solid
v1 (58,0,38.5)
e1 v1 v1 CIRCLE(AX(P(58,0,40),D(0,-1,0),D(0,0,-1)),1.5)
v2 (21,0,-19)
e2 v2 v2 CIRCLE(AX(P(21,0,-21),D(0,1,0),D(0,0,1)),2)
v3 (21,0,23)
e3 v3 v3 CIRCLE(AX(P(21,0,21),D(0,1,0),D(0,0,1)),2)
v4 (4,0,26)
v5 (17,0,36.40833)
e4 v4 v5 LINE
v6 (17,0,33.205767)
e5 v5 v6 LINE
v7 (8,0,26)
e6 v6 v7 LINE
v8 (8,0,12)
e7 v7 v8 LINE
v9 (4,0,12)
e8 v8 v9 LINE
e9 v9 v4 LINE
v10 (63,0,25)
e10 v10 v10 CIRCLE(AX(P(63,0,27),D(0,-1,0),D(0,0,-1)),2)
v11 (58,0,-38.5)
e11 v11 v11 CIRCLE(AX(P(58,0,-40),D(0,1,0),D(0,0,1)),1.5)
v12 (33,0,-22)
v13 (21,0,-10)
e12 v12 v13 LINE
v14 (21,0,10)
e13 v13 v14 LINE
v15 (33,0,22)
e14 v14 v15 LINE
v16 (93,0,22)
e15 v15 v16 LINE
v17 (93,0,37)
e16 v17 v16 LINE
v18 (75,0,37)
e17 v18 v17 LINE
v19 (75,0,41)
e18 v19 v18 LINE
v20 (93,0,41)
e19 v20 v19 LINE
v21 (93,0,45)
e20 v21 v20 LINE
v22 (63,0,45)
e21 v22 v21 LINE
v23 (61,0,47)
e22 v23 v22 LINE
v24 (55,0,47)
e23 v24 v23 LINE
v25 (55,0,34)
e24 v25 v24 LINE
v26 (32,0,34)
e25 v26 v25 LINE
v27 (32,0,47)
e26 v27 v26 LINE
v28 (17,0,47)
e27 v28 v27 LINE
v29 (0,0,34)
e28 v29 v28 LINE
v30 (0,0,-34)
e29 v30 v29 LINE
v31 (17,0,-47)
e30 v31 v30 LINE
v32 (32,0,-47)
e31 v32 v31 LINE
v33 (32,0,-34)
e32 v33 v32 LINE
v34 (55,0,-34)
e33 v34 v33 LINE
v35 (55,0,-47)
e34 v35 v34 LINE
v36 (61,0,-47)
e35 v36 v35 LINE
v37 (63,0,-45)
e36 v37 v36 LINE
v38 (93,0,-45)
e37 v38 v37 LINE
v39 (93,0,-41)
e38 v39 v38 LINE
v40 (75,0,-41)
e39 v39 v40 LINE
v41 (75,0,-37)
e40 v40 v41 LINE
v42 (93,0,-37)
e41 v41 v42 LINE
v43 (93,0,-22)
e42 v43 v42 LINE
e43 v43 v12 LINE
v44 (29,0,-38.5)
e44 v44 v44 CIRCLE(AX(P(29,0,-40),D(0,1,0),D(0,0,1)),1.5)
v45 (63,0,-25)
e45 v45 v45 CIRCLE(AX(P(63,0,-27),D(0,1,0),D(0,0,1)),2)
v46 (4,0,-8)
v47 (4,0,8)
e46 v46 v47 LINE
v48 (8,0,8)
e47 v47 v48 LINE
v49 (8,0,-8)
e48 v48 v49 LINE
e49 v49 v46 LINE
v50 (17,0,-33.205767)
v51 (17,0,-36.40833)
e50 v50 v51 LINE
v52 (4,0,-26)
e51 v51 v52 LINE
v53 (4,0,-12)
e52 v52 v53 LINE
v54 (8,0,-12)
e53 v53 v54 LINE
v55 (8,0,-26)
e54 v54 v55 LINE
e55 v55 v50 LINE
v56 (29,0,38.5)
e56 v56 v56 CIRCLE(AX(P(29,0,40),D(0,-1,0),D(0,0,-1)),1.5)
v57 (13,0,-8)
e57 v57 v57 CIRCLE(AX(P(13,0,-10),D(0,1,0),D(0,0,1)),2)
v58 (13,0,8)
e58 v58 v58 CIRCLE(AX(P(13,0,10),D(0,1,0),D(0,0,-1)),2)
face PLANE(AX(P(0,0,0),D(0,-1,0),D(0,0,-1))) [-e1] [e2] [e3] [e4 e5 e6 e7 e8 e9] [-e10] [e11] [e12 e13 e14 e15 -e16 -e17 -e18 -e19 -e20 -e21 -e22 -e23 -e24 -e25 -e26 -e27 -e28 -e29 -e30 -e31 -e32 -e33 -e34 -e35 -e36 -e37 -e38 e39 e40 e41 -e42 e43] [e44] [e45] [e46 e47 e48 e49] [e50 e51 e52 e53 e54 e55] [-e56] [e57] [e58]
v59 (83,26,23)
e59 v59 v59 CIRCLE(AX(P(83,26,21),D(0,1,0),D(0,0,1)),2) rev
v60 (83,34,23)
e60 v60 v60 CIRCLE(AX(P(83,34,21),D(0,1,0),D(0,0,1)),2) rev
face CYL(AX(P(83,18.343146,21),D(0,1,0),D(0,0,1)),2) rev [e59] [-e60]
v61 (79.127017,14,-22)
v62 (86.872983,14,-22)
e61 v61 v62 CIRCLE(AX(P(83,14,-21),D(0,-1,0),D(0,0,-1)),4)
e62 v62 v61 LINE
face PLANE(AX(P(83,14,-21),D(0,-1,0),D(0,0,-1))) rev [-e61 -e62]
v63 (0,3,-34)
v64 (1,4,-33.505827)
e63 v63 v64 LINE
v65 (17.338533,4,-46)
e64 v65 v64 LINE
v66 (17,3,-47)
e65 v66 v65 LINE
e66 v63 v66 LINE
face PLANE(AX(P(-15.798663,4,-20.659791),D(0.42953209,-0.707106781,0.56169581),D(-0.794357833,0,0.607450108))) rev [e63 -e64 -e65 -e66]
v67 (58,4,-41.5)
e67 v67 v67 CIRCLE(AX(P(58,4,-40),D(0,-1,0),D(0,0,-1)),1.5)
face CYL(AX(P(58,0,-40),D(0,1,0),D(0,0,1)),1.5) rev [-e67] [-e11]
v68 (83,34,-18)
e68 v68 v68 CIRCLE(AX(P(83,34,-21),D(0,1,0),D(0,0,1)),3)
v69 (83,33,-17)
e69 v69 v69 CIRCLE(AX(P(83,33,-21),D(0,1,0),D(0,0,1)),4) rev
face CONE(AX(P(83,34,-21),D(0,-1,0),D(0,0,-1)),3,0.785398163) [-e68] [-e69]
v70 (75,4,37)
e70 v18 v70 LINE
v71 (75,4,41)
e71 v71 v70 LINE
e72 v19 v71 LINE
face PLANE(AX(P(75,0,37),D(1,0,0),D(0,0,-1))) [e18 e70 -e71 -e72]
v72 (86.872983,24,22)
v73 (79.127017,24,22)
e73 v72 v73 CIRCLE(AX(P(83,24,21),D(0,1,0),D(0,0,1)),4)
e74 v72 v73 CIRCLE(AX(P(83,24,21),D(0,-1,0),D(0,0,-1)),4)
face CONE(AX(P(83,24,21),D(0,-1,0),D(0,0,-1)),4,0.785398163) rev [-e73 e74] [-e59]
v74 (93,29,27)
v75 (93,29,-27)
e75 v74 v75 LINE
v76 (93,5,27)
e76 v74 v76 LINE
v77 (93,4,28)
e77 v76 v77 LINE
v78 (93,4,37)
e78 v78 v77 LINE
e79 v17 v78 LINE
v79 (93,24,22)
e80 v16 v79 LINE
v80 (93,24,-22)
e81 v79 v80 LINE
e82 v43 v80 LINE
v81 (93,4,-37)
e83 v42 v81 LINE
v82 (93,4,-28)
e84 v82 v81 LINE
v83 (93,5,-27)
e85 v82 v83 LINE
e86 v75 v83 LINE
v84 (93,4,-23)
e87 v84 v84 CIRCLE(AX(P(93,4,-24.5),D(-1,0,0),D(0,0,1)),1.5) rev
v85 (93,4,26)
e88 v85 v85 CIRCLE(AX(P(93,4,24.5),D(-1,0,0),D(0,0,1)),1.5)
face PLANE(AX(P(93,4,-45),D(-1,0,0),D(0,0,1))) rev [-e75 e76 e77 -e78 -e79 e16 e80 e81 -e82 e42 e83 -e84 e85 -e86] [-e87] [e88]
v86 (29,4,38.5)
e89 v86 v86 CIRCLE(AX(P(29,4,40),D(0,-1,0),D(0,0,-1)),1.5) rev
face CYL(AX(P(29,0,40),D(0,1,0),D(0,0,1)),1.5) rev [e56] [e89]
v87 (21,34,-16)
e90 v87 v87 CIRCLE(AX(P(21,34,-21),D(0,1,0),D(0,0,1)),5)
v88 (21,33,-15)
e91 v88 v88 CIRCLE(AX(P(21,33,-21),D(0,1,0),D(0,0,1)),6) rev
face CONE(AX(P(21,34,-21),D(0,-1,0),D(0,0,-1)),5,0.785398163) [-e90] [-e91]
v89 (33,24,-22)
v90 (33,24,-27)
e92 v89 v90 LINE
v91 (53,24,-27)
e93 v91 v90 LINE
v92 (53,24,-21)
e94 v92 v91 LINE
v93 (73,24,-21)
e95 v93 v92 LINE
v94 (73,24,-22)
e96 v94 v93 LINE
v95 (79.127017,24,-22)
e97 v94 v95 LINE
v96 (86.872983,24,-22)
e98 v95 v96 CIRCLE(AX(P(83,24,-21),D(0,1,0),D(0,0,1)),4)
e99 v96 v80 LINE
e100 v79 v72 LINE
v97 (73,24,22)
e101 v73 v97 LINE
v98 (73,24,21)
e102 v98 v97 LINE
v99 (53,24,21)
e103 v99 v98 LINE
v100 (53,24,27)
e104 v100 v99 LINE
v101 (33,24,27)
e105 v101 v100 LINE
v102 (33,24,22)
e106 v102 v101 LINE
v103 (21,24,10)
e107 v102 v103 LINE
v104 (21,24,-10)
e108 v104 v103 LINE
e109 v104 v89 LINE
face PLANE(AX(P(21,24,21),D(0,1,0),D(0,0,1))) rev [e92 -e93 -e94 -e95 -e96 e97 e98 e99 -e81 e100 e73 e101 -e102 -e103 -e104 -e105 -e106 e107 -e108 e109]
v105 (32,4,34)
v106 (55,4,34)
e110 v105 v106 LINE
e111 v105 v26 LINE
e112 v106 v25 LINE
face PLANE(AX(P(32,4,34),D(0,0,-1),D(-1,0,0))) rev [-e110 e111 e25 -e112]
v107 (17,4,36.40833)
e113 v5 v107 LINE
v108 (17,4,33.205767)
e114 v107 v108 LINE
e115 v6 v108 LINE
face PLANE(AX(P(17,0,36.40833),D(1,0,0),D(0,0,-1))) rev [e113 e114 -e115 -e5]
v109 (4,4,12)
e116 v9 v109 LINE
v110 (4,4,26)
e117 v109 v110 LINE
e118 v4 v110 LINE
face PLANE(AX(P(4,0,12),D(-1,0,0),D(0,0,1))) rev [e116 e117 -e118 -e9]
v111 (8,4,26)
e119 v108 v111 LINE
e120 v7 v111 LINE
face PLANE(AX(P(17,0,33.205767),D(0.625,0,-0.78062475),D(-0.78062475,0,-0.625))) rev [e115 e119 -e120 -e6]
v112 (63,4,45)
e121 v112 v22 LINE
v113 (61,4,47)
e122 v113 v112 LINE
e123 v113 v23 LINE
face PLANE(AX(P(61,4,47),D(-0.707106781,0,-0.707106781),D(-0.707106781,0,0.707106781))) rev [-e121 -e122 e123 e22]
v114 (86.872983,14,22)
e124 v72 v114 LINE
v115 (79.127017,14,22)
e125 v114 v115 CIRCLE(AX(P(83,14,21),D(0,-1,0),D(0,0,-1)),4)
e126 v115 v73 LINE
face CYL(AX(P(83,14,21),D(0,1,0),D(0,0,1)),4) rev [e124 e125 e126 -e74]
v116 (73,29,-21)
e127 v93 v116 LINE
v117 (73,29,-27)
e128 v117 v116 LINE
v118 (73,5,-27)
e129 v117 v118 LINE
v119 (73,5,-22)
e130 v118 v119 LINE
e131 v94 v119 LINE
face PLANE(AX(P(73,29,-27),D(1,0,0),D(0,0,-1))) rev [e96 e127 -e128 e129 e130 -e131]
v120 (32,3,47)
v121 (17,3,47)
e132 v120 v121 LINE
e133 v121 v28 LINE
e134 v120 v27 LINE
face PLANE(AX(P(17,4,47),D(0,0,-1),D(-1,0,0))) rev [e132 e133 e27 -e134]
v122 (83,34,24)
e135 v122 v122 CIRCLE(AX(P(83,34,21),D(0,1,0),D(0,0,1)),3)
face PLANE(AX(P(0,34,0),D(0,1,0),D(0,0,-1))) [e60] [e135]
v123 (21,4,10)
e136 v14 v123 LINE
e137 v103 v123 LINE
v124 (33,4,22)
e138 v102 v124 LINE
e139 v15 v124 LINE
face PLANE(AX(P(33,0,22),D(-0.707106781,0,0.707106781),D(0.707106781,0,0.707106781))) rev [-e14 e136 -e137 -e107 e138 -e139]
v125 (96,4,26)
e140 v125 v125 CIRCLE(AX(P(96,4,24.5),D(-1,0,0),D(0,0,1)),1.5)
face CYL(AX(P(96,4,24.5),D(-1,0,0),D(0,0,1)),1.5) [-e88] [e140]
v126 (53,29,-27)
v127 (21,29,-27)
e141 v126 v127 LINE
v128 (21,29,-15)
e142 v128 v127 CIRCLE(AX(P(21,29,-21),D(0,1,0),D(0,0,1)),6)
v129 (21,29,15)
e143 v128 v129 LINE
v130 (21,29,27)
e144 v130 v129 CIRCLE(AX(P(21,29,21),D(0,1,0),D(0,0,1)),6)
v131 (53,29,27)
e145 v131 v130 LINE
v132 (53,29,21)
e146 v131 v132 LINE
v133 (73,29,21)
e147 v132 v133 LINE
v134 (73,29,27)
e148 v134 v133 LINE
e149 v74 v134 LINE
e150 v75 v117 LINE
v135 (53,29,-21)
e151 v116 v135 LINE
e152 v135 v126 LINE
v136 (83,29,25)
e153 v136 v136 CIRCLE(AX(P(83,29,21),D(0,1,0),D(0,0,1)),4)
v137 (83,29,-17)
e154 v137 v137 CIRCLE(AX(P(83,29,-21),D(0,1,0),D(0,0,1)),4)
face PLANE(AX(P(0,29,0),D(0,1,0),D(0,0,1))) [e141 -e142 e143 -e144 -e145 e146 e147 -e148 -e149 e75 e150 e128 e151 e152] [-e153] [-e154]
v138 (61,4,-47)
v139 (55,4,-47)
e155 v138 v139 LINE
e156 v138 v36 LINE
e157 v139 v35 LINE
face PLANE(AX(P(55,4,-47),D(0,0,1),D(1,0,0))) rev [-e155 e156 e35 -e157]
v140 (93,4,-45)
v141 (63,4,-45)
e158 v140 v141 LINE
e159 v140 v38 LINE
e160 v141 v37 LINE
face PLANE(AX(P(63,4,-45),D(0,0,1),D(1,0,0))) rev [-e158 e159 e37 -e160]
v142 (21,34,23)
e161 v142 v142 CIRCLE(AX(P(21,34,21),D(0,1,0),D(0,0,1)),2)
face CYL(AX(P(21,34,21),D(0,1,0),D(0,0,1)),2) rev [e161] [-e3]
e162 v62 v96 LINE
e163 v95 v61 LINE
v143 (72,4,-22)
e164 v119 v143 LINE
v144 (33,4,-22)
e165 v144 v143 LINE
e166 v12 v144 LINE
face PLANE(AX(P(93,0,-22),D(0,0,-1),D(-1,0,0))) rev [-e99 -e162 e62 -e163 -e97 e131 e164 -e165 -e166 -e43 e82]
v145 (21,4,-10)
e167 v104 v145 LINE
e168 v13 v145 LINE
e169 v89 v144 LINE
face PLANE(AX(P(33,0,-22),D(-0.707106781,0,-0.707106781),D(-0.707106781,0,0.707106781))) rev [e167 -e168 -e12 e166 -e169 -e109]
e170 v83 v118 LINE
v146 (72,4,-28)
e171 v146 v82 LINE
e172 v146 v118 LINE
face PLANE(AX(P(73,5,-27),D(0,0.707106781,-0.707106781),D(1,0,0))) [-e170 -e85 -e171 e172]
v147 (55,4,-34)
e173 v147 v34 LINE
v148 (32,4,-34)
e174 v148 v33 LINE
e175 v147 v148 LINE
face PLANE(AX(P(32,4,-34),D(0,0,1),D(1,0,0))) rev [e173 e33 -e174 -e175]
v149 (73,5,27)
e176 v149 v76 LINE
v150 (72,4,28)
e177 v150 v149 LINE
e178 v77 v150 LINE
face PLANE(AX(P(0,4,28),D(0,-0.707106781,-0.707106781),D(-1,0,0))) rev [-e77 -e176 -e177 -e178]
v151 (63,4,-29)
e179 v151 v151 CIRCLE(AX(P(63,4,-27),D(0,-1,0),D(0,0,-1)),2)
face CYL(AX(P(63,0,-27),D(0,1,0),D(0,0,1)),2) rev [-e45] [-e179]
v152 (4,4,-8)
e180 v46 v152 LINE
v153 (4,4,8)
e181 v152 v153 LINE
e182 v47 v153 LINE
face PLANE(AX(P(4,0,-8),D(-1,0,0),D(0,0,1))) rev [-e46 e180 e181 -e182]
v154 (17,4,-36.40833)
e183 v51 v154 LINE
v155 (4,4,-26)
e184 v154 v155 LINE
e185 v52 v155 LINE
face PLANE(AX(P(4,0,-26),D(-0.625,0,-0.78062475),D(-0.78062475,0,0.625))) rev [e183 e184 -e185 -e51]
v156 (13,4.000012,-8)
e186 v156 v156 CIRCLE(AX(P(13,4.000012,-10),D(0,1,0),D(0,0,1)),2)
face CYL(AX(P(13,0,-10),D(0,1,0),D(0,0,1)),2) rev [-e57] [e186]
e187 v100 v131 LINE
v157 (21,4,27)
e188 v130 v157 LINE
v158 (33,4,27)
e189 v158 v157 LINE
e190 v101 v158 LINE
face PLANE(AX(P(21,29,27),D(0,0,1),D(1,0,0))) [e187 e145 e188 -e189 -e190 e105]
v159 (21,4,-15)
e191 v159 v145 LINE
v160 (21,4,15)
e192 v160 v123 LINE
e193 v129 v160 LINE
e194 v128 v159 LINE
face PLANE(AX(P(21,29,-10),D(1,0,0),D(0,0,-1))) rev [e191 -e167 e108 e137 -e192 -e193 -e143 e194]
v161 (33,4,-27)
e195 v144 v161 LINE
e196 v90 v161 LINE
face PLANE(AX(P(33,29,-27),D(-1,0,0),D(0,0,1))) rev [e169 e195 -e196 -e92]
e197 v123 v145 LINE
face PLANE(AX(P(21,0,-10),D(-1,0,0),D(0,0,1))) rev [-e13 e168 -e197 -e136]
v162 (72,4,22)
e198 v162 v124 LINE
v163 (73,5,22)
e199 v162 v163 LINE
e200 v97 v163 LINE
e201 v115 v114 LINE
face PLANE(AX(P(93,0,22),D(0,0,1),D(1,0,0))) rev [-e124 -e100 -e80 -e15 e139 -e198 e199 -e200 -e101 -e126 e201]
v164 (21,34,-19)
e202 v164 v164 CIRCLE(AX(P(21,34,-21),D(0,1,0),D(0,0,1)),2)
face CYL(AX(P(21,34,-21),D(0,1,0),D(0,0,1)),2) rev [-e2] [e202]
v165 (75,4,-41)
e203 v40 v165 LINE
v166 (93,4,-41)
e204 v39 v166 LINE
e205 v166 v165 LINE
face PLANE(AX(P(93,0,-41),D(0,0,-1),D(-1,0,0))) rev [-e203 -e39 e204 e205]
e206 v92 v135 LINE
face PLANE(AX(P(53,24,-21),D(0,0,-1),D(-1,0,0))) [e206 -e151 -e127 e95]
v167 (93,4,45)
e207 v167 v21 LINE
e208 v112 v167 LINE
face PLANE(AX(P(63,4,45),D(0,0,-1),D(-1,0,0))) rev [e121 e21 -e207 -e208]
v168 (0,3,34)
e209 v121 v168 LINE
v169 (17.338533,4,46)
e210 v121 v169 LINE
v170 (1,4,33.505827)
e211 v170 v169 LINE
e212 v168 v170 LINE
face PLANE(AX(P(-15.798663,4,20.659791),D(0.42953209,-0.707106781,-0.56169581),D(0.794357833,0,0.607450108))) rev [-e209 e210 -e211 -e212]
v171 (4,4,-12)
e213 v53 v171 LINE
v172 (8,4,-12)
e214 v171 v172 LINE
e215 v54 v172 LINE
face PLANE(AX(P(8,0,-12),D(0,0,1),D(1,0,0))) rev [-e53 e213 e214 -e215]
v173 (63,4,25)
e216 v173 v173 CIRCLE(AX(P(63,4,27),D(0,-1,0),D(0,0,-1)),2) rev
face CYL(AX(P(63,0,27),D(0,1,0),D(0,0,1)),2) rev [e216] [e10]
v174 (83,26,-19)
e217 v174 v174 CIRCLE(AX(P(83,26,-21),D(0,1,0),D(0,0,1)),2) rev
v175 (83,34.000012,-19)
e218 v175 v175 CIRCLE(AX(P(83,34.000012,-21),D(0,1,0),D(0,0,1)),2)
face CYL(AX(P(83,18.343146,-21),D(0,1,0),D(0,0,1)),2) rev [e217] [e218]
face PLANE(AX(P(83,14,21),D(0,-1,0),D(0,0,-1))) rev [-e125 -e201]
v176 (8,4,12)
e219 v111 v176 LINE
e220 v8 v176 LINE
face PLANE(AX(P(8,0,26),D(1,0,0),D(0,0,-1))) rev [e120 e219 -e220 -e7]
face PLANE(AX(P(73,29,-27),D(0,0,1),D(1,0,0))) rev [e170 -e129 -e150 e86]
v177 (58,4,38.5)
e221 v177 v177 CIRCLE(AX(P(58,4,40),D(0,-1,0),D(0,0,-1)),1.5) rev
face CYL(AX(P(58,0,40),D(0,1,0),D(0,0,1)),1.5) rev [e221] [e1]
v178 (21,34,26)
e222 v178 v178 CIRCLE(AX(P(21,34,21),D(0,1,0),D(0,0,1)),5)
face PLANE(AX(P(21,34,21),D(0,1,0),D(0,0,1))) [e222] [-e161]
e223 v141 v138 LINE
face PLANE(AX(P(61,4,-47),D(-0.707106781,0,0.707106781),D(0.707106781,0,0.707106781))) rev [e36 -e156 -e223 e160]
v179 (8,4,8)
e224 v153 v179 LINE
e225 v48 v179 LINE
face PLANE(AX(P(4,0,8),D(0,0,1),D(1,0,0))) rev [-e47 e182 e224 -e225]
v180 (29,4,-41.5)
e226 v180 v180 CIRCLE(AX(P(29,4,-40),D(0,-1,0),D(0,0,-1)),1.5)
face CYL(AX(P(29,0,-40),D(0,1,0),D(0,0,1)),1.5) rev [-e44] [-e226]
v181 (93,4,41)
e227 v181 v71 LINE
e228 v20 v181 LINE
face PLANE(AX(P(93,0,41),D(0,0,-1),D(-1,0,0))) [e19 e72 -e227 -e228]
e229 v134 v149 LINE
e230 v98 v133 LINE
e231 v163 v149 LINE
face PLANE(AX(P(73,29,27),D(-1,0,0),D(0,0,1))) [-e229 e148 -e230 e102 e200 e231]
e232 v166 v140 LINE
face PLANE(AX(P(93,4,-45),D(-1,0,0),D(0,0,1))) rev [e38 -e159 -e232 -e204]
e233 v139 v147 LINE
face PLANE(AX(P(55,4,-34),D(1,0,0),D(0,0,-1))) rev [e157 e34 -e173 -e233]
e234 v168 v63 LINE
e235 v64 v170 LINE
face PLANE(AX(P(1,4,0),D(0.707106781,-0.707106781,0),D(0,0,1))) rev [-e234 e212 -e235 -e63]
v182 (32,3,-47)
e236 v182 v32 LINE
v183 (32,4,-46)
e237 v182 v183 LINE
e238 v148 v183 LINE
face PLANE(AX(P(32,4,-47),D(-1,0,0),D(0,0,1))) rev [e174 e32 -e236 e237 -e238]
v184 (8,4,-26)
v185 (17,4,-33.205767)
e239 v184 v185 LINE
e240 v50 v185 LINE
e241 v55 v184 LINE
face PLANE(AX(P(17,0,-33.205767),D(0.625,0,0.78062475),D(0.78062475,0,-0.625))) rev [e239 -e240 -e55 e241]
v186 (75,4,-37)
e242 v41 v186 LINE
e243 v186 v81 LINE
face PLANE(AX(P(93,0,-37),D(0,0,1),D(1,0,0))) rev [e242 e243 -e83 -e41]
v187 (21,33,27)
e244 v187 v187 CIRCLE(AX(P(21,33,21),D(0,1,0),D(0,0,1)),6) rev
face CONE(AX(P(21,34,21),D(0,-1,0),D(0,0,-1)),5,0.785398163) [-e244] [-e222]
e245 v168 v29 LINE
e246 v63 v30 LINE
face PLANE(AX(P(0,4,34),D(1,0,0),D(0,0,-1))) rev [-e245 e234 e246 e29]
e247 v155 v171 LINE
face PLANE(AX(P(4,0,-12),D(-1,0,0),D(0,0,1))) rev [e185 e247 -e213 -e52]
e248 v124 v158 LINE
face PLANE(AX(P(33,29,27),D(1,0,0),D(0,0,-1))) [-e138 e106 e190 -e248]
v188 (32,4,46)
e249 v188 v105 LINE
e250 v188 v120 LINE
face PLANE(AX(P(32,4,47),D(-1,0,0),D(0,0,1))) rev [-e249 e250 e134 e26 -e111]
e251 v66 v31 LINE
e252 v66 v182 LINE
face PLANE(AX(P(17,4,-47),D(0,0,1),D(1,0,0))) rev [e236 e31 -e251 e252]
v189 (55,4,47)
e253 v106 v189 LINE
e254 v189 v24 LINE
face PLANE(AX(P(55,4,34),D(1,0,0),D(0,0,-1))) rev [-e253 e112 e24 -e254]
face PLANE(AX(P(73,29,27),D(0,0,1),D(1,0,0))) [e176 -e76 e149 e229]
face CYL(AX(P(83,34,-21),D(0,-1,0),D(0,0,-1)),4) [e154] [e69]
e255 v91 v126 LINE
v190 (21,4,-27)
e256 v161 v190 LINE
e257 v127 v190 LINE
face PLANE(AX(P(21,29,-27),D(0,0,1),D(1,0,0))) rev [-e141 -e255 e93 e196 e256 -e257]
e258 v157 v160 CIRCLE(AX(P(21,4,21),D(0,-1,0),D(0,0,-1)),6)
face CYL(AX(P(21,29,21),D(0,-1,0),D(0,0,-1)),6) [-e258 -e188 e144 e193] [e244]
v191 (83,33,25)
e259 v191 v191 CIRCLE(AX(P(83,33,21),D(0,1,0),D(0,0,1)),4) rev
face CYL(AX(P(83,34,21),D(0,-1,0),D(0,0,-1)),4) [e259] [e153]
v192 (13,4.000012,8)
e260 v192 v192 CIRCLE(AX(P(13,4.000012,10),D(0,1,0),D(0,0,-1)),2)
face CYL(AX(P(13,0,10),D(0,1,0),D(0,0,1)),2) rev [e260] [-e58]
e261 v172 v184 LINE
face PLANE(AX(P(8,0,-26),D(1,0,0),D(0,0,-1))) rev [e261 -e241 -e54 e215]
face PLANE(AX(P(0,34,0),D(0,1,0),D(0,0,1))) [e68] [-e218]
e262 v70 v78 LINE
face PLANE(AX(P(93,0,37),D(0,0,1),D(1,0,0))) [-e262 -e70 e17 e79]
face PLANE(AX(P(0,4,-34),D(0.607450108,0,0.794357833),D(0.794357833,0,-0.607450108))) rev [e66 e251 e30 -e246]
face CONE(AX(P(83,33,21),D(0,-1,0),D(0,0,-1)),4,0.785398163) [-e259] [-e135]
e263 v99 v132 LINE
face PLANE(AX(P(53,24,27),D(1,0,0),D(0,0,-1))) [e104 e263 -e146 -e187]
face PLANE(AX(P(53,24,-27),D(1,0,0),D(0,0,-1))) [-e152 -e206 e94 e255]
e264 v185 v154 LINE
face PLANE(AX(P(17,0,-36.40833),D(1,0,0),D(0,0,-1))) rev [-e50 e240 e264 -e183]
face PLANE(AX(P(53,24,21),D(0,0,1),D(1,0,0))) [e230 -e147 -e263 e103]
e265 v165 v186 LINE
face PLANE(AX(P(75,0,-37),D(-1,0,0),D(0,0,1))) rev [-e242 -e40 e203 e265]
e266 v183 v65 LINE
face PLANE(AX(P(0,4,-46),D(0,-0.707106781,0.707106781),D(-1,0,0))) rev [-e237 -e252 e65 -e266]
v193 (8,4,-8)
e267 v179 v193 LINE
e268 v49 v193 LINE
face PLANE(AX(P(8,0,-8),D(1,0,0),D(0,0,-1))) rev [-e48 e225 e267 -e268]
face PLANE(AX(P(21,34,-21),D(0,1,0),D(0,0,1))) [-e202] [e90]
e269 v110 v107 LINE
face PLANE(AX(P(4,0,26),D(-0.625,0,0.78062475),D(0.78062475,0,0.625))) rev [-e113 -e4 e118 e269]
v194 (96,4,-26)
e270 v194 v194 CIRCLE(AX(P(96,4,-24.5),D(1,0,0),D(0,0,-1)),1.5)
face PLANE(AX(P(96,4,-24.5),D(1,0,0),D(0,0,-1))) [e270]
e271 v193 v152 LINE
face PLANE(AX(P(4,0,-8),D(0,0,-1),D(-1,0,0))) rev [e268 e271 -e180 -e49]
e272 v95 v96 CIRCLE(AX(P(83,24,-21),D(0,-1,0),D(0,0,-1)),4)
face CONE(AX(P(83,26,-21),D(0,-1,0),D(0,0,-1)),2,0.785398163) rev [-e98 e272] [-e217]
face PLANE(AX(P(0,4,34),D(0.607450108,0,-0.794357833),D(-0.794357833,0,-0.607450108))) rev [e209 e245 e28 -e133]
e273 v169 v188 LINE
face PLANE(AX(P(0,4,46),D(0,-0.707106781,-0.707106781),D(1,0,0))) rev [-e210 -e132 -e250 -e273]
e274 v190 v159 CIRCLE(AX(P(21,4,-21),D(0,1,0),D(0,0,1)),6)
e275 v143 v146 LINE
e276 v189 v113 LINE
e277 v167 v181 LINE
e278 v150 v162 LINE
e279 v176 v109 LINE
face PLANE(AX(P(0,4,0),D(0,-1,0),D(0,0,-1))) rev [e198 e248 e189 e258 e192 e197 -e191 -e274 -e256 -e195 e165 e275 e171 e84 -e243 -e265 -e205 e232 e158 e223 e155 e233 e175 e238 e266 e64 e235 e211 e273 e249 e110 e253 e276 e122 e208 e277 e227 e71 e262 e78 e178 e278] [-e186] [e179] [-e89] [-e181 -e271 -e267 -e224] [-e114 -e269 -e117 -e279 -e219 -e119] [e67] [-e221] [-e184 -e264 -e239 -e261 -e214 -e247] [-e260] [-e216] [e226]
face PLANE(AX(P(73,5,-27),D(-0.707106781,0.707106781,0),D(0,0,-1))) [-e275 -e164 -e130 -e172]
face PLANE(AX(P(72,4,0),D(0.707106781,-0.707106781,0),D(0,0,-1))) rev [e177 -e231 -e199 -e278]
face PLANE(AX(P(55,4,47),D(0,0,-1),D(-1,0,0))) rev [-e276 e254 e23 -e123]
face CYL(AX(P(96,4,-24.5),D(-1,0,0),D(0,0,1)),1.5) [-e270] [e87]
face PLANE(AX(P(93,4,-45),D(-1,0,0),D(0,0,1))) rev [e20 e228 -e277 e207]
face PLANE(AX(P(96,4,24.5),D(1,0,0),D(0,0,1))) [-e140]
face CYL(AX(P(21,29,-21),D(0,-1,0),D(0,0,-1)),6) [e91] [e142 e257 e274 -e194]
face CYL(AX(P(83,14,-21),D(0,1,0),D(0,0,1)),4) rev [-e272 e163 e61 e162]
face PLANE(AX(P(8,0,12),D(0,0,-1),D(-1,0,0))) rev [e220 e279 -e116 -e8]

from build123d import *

# Parameters (mm, degrees)
EXTRUDE_1_DEPTH                = 4
CUT_EXTRUDE_1_DEPTH            = 105.27847333
CUT_EXTRUDE_1_DEPTH_BACK       = 105.27847333
SKETCH_2_R                     = 2
SKETCH_2_W                     = 4
SKETCH_2_H                     = 16
CHAMFER_1_SIZE                 = 1
CUT_EXTRUDE_2_DEPTH            = 105.27847333
CUT_EXTRUDE_2_DEPTH_BACK       = 105.27847333
SKETCH_6_W                     = 20
SKETCH_6_H                     = 5
EXTRUDE_2_DEPTH                = 25
CHAMFER_2_SIZE                 = 1
EXTRUDE_START                  = -5
EXTRUDE_3_DEPTH                = 5
SKETCH_8_R                     = 6
EXTRUDE_4_DEPTH                = 5
CHAMFER_3_SIZE                 = 1
SKETCH_9_R                     = 4
EXTRUDE_5_DEPTH                = 5
CUT_EXTRUDE_START              = -10
SKETCH_10_R                    = 2
CUT_EXTRUDE_3_DEPTH            = 120.608393839
HOLE_WIZARD_1_4_0_15748031_1_D = 3.999999874
SKETCH_13_R                    = 1.5
CUT_EXTRUDE_4_DEPTH            = 109.434311913
SKETCH_14_R                    = 2
CUT_EXTRUDE_5_DEPTH            = 109.434311913
CUT_EXTRUDE_START_2            = 10
SKETCH_15_R                    = 4
CUT_EXTRUDE_6_DEPTH            = 10
CHAMFER_4_SIZE                 = 2
CHAMFER_5_SIZE                 = 1
SKETCH_16_W                    = 18
SKETCH_16_H                    = 4
CUT_EXTRUDE_7_DEPTH            = 109.434311913
SKETCH_17_R                    = 1.5
EXTRUDE_6_DEPTH                = 3


with BuildPart() as part:
    # 草图1 → 凸台-拉伸1 (new body)
    with BuildSketch(Plane(origin=(0, 0, 0), x_dir=(1, 0, 0), z_dir=(0, 1, 0))):
        Polygon((0, -34), (0, 34), (17, 47), (32, 47), (32, 34), (55, 34), (55, 47), (61, 47), (63, 45), (93, 45), (93, -45), (63, -45), (61, -47), (55, -47), (55, -34), (32, -34), (32, -47), (17, -47), align=None)
    extrude(amount=EXTRUDE_1_DEPTH)

    # 草图2 → 切除-拉伸1 (cut, two sides: drawn at the far end of the back side and taken through both)
    with BuildSketch(Plane(origin=(0, 4, 0), x_dir=(1, 0, 0), z_dir=(0, 1, 0)).offset(-CUT_EXTRUDE_1_DEPTH_BACK)):
        with Locations(Location((13, 10, 0), (0, 0, 270))):
            Circle(SKETCH_2_R)
        with Locations(Location((13, -10, 0), (0, 0, 90))):
            Circle(SKETCH_2_R)
        with Locations((6, 0)):
            Rectangle(SKETCH_2_W, SKETCH_2_H)
        Polygon((4, 12), (4, 26), (17, 36.408329997), (17, 33.205766921), (8, 26), (8, 12), align=None)
        Polygon((8, -26), (8, -12), (4, -12), (4, -26), (17, -36.408329997), (17, -33.205766921), align=None)
    extrude(amount=CUT_EXTRUDE_1_DEPTH + CUT_EXTRUDE_1_DEPTH_BACK, mode=Mode.SUBTRACT)

    # 倒角1
    chamfer_1_edges = [part.edges().sort_by_distance(p)[0] for p in [
        (8.5, 4, 40.5),
        (24.5, 4, 47),
        (8.5, 4, -40.5),
        (24.5, 4, -47),
        (0, 4, 0),
    ]]
    chamfer(chamfer_1_edges, length=CHAMFER_1_SIZE)

    # 草图3 → 切除-拉伸2 (cut, two sides: drawn at the far end of the back side and taken through both)
    with BuildSketch(Plane(origin=(0, 4, 0), x_dir=(1, 0, 0), z_dir=(0, 1, 0)).offset(-CUT_EXTRUDE_2_DEPTH_BACK)):
        Polygon((93, 22), (33, 22), (21, 10), (21, -10), (33, -22), (93, -22), align=None)
    extrude(amount=CUT_EXTRUDE_2_DEPTH + CUT_EXTRUDE_2_DEPTH_BACK, mode=Mode.SUBTRACT)

    # 草图6 → 凸台-拉伸2 (add)
    with BuildSketch(Plane(origin=(0, 4, 0), x_dir=(1, 0, 0), z_dir=(0, 1, 0))):
        with BuildLine():
            Line((21, 10), (21, 15))
            ThreePointArc((21, 15), (15, 21), (21, 27))
            Line((21, 27), (33, 27))
            Line((33, 27), (33, 22))
            Line((33, 22), (21, 10))
        make_face()
        with Locations((83, 24.5)):
            Rectangle(SKETCH_6_W, SKETCH_6_H)
    extrude_2 = extrude(amount=EXTRUDE_2_DEPTH)

    # 镜向1: 凸台-拉伸2 across plane
    add(extrude_2.mirror(Plane.XY))

    # 倒角2
    chamfer_2_edges = [part.edges().sort_by_distance(p)[0] for p in [
        (83, 4, -27),
        (73, 4, -24.5),
        (83, 4, 27),
        (73, 4, 24.5),
    ]]
    chamfer(chamfer_2_edges, length=CHAMFER_2_SIZE)

    # 草图7 → 凸台-拉伸3 (add)
    with BuildSketch(Plane(origin=(0, 29, 0), x_dir=(1, 0, 0), z_dir=(0, 1, 0)).offset(EXTRUDE_START)):
        with BuildLine():
            Line((93, 22), (93, 27))
            Line((93, 27), (73, 27))
            Line((73, 27), (73, 21))
            Line((73, 21), (53, 21))
            Line((53, 21), (53, 27))
            Line((53, 27), (33, 27))
            Line((33, 27), (21, 27))
            ThreePointArc((21, 27), (15, 21), (21, 15))
            Line((21, 15), (21, 10))
            Line((21, 10), (21, -10))
            Line((21, -10), (21, -15))
            ThreePointArc((21, -15), (15, -21), (21, -27))
            Line((21, -27), (33, -27))
            Line((33, -27), (53, -27))
            Line((53, -27), (53, -21))
            Line((53, -21), (73, -21))
            Line((73, -21), (73, -27))
            Line((73, -27), (93, -27))
            Line((93, -27), (93, -22))
            Line((93, -22), (93, 22))
        make_face()
    extrude(amount=EXTRUDE_3_DEPTH)

    # 草图8 → 凸台-拉伸4 (add)
    with BuildSketch(Plane(origin=(0, 29, 0), x_dir=(1, 0, 0), z_dir=(0, 1, 0))):
        with Locations(Location((21, 21, 0), (0, 0, 270))):
            Circle(SKETCH_8_R)
        with Locations(Location((21, -21, 0), (0, 0, 270))):
            Circle(SKETCH_8_R)
    extrude(amount=EXTRUDE_4_DEPTH)

    # 倒角3
    chamfer_3_edges = [part.edges().sort_by_distance(p)[0] for p in [
        (21, 34, -27),
        (21, 34, 15),
    ]]
    chamfer(chamfer_3_edges, length=CHAMFER_3_SIZE)

    # 草图9 → 凸台-拉伸5 (add)
    with BuildSketch(Plane(origin=(0, 29, 0), x_dir=(1, 0, 0), z_dir=(0, 1, 0))):
        with Locations(Location((83, 21, 0), (0, 0, 270))):
            Circle(SKETCH_9_R)
    extrude_5 = extrude(amount=EXTRUDE_5_DEPTH)

    # 草图10 → 切除-拉伸3 (cut)
    with BuildSketch(Plane(origin=(0, 34, 0), x_dir=(1, 0, 0), z_dir=(0, 1, 0)).offset(CUT_EXTRUDE_START)):
        with Locations(Location((83, 21, 0), (0, 0, 270))):
            Circle(SKETCH_10_R)
    cut_extrude_3 = extrude(amount=CUT_EXTRUDE_3_DEPTH, mode=Mode.SUBTRACT)

    # 镜向2: 凸台-拉伸5, 切除-拉伸3 across plane
    add(extrude_5.mirror(Plane.XY))
    add(cut_extrude_3.mirror(Plane.XY), mode=Mode.SUBTRACT)

    # 1/4 (0.15748031) 直径孔1 (through all)
    with Locations(Plane(origin=(21, 34, -21), x_dir=(0, 0, 1), z_dir=(0, 1, 0))):
        with Locations((0, 0)):
            hole_wizard_1_4_0_15748031_1 = Hole(HOLE_WIZARD_1_4_0_15748031_1_D / 2)

    # 镜向3: 1/4 (0.15748031) 直径孔1 across plane
    add(hole_wizard_1_4_0_15748031_1.mirror(Plane.XY), mode=Mode.SUBTRACT)

    # 草图13 → 切除-拉伸4 (cut, symmetric)
    with BuildSketch(Plane(origin=(0, 4, 0), x_dir=(1, 0, 0), z_dir=(0, 1, 0))):
        with Locations(Location((29, 40, 0), (0, 0, 270))):
            Circle(SKETCH_13_R)
        with Locations(Location((58, 40, 0), (0, 0, 270))):
            Circle(SKETCH_13_R)
    cut_extrude_4 = extrude(amount=CUT_EXTRUDE_4_DEPTH, both=True, mode=Mode.SUBTRACT)

    # 镜向4: 切除-拉伸4 across plane
    add(cut_extrude_4.mirror(Plane.XY), mode=Mode.SUBTRACT)

    # 草图14 → 切除-拉伸5 (cut, symmetric)
    with BuildSketch(Plane(origin=(0, 4, 0), x_dir=(1, 0, 0), z_dir=(0, 1, 0))):
        with Locations(Location((63, 27, 0), (0, 0, 270))):
            Circle(SKETCH_14_R)
    cut_extrude_5 = extrude(amount=CUT_EXTRUDE_5_DEPTH, both=True, mode=Mode.SUBTRACT)

    # 镜向5: 切除-拉伸5 across plane
    add(cut_extrude_5.mirror(Plane.XY), mode=Mode.SUBTRACT)

    # 草图15 → 切除-拉伸6 (cut)
    with BuildSketch(Plane.XZ.offset(-24).offset(CUT_EXTRUDE_START_2)):
        with Locations(Location((83, 21, 0), (0, 0, 270))):
            Circle(SKETCH_15_R)
        with Locations(Location((83, -21, 0), (0, 0, 90))):
            Circle(SKETCH_15_R)
    extrude(amount=-CUT_EXTRUDE_6_DEPTH, mode=Mode.SUBTRACT)

    # 倒角4
    chamfer_4_edges = [part.edges().sort_by_distance(p)[0] for p in [
        (83, 24, -23),
        (83, 24, 23),
    ]]
    chamfer(chamfer_4_edges, length=CHAMFER_4_SIZE - 0.0001)  # a hair under: the kernel refuses the full size

    # 倒角5
    chamfer_5_edges = [part.edges().sort_by_distance(p)[0] for p in [
        (83, 34, -25),
        (83, 34, 25),
    ]]
    chamfer(chamfer_5_edges, length=CHAMFER_5_SIZE)

    # 草图16 → 切除-拉伸7 (cut, through all)
    with BuildSketch(Plane(origin=(0, 4, 0), x_dir=(1, 0, 0), z_dir=(0, 1, 0))):
        with Locations((84, 39)):
            Rectangle(SKETCH_16_W, SKETCH_16_H)
    cut_extrude_7 = extrude(amount=-CUT_EXTRUDE_7_DEPTH, mode=Mode.SUBTRACT)

    # 镜向6: 切除-拉伸7 across plane
    add(cut_extrude_7.mirror(Plane.XY), mode=Mode.SUBTRACT)

    # 草图17 → 凸台-拉伸6 (add)
    with BuildSketch(Plane(origin=(93, 0, 0), x_dir=(0, 0, -1), z_dir=(1, 0, 0))):
        with Locations(Location((24.5, 4, 0), (0, 0, 180))):
            Circle(SKETCH_17_R)
    extrude_6 = extrude(amount=EXTRUDE_6_DEPTH)

    # 镜向7: 凸台-拉伸6 across plane
    add(extrude_6.mirror(Plane.XY))


solid = part.part
